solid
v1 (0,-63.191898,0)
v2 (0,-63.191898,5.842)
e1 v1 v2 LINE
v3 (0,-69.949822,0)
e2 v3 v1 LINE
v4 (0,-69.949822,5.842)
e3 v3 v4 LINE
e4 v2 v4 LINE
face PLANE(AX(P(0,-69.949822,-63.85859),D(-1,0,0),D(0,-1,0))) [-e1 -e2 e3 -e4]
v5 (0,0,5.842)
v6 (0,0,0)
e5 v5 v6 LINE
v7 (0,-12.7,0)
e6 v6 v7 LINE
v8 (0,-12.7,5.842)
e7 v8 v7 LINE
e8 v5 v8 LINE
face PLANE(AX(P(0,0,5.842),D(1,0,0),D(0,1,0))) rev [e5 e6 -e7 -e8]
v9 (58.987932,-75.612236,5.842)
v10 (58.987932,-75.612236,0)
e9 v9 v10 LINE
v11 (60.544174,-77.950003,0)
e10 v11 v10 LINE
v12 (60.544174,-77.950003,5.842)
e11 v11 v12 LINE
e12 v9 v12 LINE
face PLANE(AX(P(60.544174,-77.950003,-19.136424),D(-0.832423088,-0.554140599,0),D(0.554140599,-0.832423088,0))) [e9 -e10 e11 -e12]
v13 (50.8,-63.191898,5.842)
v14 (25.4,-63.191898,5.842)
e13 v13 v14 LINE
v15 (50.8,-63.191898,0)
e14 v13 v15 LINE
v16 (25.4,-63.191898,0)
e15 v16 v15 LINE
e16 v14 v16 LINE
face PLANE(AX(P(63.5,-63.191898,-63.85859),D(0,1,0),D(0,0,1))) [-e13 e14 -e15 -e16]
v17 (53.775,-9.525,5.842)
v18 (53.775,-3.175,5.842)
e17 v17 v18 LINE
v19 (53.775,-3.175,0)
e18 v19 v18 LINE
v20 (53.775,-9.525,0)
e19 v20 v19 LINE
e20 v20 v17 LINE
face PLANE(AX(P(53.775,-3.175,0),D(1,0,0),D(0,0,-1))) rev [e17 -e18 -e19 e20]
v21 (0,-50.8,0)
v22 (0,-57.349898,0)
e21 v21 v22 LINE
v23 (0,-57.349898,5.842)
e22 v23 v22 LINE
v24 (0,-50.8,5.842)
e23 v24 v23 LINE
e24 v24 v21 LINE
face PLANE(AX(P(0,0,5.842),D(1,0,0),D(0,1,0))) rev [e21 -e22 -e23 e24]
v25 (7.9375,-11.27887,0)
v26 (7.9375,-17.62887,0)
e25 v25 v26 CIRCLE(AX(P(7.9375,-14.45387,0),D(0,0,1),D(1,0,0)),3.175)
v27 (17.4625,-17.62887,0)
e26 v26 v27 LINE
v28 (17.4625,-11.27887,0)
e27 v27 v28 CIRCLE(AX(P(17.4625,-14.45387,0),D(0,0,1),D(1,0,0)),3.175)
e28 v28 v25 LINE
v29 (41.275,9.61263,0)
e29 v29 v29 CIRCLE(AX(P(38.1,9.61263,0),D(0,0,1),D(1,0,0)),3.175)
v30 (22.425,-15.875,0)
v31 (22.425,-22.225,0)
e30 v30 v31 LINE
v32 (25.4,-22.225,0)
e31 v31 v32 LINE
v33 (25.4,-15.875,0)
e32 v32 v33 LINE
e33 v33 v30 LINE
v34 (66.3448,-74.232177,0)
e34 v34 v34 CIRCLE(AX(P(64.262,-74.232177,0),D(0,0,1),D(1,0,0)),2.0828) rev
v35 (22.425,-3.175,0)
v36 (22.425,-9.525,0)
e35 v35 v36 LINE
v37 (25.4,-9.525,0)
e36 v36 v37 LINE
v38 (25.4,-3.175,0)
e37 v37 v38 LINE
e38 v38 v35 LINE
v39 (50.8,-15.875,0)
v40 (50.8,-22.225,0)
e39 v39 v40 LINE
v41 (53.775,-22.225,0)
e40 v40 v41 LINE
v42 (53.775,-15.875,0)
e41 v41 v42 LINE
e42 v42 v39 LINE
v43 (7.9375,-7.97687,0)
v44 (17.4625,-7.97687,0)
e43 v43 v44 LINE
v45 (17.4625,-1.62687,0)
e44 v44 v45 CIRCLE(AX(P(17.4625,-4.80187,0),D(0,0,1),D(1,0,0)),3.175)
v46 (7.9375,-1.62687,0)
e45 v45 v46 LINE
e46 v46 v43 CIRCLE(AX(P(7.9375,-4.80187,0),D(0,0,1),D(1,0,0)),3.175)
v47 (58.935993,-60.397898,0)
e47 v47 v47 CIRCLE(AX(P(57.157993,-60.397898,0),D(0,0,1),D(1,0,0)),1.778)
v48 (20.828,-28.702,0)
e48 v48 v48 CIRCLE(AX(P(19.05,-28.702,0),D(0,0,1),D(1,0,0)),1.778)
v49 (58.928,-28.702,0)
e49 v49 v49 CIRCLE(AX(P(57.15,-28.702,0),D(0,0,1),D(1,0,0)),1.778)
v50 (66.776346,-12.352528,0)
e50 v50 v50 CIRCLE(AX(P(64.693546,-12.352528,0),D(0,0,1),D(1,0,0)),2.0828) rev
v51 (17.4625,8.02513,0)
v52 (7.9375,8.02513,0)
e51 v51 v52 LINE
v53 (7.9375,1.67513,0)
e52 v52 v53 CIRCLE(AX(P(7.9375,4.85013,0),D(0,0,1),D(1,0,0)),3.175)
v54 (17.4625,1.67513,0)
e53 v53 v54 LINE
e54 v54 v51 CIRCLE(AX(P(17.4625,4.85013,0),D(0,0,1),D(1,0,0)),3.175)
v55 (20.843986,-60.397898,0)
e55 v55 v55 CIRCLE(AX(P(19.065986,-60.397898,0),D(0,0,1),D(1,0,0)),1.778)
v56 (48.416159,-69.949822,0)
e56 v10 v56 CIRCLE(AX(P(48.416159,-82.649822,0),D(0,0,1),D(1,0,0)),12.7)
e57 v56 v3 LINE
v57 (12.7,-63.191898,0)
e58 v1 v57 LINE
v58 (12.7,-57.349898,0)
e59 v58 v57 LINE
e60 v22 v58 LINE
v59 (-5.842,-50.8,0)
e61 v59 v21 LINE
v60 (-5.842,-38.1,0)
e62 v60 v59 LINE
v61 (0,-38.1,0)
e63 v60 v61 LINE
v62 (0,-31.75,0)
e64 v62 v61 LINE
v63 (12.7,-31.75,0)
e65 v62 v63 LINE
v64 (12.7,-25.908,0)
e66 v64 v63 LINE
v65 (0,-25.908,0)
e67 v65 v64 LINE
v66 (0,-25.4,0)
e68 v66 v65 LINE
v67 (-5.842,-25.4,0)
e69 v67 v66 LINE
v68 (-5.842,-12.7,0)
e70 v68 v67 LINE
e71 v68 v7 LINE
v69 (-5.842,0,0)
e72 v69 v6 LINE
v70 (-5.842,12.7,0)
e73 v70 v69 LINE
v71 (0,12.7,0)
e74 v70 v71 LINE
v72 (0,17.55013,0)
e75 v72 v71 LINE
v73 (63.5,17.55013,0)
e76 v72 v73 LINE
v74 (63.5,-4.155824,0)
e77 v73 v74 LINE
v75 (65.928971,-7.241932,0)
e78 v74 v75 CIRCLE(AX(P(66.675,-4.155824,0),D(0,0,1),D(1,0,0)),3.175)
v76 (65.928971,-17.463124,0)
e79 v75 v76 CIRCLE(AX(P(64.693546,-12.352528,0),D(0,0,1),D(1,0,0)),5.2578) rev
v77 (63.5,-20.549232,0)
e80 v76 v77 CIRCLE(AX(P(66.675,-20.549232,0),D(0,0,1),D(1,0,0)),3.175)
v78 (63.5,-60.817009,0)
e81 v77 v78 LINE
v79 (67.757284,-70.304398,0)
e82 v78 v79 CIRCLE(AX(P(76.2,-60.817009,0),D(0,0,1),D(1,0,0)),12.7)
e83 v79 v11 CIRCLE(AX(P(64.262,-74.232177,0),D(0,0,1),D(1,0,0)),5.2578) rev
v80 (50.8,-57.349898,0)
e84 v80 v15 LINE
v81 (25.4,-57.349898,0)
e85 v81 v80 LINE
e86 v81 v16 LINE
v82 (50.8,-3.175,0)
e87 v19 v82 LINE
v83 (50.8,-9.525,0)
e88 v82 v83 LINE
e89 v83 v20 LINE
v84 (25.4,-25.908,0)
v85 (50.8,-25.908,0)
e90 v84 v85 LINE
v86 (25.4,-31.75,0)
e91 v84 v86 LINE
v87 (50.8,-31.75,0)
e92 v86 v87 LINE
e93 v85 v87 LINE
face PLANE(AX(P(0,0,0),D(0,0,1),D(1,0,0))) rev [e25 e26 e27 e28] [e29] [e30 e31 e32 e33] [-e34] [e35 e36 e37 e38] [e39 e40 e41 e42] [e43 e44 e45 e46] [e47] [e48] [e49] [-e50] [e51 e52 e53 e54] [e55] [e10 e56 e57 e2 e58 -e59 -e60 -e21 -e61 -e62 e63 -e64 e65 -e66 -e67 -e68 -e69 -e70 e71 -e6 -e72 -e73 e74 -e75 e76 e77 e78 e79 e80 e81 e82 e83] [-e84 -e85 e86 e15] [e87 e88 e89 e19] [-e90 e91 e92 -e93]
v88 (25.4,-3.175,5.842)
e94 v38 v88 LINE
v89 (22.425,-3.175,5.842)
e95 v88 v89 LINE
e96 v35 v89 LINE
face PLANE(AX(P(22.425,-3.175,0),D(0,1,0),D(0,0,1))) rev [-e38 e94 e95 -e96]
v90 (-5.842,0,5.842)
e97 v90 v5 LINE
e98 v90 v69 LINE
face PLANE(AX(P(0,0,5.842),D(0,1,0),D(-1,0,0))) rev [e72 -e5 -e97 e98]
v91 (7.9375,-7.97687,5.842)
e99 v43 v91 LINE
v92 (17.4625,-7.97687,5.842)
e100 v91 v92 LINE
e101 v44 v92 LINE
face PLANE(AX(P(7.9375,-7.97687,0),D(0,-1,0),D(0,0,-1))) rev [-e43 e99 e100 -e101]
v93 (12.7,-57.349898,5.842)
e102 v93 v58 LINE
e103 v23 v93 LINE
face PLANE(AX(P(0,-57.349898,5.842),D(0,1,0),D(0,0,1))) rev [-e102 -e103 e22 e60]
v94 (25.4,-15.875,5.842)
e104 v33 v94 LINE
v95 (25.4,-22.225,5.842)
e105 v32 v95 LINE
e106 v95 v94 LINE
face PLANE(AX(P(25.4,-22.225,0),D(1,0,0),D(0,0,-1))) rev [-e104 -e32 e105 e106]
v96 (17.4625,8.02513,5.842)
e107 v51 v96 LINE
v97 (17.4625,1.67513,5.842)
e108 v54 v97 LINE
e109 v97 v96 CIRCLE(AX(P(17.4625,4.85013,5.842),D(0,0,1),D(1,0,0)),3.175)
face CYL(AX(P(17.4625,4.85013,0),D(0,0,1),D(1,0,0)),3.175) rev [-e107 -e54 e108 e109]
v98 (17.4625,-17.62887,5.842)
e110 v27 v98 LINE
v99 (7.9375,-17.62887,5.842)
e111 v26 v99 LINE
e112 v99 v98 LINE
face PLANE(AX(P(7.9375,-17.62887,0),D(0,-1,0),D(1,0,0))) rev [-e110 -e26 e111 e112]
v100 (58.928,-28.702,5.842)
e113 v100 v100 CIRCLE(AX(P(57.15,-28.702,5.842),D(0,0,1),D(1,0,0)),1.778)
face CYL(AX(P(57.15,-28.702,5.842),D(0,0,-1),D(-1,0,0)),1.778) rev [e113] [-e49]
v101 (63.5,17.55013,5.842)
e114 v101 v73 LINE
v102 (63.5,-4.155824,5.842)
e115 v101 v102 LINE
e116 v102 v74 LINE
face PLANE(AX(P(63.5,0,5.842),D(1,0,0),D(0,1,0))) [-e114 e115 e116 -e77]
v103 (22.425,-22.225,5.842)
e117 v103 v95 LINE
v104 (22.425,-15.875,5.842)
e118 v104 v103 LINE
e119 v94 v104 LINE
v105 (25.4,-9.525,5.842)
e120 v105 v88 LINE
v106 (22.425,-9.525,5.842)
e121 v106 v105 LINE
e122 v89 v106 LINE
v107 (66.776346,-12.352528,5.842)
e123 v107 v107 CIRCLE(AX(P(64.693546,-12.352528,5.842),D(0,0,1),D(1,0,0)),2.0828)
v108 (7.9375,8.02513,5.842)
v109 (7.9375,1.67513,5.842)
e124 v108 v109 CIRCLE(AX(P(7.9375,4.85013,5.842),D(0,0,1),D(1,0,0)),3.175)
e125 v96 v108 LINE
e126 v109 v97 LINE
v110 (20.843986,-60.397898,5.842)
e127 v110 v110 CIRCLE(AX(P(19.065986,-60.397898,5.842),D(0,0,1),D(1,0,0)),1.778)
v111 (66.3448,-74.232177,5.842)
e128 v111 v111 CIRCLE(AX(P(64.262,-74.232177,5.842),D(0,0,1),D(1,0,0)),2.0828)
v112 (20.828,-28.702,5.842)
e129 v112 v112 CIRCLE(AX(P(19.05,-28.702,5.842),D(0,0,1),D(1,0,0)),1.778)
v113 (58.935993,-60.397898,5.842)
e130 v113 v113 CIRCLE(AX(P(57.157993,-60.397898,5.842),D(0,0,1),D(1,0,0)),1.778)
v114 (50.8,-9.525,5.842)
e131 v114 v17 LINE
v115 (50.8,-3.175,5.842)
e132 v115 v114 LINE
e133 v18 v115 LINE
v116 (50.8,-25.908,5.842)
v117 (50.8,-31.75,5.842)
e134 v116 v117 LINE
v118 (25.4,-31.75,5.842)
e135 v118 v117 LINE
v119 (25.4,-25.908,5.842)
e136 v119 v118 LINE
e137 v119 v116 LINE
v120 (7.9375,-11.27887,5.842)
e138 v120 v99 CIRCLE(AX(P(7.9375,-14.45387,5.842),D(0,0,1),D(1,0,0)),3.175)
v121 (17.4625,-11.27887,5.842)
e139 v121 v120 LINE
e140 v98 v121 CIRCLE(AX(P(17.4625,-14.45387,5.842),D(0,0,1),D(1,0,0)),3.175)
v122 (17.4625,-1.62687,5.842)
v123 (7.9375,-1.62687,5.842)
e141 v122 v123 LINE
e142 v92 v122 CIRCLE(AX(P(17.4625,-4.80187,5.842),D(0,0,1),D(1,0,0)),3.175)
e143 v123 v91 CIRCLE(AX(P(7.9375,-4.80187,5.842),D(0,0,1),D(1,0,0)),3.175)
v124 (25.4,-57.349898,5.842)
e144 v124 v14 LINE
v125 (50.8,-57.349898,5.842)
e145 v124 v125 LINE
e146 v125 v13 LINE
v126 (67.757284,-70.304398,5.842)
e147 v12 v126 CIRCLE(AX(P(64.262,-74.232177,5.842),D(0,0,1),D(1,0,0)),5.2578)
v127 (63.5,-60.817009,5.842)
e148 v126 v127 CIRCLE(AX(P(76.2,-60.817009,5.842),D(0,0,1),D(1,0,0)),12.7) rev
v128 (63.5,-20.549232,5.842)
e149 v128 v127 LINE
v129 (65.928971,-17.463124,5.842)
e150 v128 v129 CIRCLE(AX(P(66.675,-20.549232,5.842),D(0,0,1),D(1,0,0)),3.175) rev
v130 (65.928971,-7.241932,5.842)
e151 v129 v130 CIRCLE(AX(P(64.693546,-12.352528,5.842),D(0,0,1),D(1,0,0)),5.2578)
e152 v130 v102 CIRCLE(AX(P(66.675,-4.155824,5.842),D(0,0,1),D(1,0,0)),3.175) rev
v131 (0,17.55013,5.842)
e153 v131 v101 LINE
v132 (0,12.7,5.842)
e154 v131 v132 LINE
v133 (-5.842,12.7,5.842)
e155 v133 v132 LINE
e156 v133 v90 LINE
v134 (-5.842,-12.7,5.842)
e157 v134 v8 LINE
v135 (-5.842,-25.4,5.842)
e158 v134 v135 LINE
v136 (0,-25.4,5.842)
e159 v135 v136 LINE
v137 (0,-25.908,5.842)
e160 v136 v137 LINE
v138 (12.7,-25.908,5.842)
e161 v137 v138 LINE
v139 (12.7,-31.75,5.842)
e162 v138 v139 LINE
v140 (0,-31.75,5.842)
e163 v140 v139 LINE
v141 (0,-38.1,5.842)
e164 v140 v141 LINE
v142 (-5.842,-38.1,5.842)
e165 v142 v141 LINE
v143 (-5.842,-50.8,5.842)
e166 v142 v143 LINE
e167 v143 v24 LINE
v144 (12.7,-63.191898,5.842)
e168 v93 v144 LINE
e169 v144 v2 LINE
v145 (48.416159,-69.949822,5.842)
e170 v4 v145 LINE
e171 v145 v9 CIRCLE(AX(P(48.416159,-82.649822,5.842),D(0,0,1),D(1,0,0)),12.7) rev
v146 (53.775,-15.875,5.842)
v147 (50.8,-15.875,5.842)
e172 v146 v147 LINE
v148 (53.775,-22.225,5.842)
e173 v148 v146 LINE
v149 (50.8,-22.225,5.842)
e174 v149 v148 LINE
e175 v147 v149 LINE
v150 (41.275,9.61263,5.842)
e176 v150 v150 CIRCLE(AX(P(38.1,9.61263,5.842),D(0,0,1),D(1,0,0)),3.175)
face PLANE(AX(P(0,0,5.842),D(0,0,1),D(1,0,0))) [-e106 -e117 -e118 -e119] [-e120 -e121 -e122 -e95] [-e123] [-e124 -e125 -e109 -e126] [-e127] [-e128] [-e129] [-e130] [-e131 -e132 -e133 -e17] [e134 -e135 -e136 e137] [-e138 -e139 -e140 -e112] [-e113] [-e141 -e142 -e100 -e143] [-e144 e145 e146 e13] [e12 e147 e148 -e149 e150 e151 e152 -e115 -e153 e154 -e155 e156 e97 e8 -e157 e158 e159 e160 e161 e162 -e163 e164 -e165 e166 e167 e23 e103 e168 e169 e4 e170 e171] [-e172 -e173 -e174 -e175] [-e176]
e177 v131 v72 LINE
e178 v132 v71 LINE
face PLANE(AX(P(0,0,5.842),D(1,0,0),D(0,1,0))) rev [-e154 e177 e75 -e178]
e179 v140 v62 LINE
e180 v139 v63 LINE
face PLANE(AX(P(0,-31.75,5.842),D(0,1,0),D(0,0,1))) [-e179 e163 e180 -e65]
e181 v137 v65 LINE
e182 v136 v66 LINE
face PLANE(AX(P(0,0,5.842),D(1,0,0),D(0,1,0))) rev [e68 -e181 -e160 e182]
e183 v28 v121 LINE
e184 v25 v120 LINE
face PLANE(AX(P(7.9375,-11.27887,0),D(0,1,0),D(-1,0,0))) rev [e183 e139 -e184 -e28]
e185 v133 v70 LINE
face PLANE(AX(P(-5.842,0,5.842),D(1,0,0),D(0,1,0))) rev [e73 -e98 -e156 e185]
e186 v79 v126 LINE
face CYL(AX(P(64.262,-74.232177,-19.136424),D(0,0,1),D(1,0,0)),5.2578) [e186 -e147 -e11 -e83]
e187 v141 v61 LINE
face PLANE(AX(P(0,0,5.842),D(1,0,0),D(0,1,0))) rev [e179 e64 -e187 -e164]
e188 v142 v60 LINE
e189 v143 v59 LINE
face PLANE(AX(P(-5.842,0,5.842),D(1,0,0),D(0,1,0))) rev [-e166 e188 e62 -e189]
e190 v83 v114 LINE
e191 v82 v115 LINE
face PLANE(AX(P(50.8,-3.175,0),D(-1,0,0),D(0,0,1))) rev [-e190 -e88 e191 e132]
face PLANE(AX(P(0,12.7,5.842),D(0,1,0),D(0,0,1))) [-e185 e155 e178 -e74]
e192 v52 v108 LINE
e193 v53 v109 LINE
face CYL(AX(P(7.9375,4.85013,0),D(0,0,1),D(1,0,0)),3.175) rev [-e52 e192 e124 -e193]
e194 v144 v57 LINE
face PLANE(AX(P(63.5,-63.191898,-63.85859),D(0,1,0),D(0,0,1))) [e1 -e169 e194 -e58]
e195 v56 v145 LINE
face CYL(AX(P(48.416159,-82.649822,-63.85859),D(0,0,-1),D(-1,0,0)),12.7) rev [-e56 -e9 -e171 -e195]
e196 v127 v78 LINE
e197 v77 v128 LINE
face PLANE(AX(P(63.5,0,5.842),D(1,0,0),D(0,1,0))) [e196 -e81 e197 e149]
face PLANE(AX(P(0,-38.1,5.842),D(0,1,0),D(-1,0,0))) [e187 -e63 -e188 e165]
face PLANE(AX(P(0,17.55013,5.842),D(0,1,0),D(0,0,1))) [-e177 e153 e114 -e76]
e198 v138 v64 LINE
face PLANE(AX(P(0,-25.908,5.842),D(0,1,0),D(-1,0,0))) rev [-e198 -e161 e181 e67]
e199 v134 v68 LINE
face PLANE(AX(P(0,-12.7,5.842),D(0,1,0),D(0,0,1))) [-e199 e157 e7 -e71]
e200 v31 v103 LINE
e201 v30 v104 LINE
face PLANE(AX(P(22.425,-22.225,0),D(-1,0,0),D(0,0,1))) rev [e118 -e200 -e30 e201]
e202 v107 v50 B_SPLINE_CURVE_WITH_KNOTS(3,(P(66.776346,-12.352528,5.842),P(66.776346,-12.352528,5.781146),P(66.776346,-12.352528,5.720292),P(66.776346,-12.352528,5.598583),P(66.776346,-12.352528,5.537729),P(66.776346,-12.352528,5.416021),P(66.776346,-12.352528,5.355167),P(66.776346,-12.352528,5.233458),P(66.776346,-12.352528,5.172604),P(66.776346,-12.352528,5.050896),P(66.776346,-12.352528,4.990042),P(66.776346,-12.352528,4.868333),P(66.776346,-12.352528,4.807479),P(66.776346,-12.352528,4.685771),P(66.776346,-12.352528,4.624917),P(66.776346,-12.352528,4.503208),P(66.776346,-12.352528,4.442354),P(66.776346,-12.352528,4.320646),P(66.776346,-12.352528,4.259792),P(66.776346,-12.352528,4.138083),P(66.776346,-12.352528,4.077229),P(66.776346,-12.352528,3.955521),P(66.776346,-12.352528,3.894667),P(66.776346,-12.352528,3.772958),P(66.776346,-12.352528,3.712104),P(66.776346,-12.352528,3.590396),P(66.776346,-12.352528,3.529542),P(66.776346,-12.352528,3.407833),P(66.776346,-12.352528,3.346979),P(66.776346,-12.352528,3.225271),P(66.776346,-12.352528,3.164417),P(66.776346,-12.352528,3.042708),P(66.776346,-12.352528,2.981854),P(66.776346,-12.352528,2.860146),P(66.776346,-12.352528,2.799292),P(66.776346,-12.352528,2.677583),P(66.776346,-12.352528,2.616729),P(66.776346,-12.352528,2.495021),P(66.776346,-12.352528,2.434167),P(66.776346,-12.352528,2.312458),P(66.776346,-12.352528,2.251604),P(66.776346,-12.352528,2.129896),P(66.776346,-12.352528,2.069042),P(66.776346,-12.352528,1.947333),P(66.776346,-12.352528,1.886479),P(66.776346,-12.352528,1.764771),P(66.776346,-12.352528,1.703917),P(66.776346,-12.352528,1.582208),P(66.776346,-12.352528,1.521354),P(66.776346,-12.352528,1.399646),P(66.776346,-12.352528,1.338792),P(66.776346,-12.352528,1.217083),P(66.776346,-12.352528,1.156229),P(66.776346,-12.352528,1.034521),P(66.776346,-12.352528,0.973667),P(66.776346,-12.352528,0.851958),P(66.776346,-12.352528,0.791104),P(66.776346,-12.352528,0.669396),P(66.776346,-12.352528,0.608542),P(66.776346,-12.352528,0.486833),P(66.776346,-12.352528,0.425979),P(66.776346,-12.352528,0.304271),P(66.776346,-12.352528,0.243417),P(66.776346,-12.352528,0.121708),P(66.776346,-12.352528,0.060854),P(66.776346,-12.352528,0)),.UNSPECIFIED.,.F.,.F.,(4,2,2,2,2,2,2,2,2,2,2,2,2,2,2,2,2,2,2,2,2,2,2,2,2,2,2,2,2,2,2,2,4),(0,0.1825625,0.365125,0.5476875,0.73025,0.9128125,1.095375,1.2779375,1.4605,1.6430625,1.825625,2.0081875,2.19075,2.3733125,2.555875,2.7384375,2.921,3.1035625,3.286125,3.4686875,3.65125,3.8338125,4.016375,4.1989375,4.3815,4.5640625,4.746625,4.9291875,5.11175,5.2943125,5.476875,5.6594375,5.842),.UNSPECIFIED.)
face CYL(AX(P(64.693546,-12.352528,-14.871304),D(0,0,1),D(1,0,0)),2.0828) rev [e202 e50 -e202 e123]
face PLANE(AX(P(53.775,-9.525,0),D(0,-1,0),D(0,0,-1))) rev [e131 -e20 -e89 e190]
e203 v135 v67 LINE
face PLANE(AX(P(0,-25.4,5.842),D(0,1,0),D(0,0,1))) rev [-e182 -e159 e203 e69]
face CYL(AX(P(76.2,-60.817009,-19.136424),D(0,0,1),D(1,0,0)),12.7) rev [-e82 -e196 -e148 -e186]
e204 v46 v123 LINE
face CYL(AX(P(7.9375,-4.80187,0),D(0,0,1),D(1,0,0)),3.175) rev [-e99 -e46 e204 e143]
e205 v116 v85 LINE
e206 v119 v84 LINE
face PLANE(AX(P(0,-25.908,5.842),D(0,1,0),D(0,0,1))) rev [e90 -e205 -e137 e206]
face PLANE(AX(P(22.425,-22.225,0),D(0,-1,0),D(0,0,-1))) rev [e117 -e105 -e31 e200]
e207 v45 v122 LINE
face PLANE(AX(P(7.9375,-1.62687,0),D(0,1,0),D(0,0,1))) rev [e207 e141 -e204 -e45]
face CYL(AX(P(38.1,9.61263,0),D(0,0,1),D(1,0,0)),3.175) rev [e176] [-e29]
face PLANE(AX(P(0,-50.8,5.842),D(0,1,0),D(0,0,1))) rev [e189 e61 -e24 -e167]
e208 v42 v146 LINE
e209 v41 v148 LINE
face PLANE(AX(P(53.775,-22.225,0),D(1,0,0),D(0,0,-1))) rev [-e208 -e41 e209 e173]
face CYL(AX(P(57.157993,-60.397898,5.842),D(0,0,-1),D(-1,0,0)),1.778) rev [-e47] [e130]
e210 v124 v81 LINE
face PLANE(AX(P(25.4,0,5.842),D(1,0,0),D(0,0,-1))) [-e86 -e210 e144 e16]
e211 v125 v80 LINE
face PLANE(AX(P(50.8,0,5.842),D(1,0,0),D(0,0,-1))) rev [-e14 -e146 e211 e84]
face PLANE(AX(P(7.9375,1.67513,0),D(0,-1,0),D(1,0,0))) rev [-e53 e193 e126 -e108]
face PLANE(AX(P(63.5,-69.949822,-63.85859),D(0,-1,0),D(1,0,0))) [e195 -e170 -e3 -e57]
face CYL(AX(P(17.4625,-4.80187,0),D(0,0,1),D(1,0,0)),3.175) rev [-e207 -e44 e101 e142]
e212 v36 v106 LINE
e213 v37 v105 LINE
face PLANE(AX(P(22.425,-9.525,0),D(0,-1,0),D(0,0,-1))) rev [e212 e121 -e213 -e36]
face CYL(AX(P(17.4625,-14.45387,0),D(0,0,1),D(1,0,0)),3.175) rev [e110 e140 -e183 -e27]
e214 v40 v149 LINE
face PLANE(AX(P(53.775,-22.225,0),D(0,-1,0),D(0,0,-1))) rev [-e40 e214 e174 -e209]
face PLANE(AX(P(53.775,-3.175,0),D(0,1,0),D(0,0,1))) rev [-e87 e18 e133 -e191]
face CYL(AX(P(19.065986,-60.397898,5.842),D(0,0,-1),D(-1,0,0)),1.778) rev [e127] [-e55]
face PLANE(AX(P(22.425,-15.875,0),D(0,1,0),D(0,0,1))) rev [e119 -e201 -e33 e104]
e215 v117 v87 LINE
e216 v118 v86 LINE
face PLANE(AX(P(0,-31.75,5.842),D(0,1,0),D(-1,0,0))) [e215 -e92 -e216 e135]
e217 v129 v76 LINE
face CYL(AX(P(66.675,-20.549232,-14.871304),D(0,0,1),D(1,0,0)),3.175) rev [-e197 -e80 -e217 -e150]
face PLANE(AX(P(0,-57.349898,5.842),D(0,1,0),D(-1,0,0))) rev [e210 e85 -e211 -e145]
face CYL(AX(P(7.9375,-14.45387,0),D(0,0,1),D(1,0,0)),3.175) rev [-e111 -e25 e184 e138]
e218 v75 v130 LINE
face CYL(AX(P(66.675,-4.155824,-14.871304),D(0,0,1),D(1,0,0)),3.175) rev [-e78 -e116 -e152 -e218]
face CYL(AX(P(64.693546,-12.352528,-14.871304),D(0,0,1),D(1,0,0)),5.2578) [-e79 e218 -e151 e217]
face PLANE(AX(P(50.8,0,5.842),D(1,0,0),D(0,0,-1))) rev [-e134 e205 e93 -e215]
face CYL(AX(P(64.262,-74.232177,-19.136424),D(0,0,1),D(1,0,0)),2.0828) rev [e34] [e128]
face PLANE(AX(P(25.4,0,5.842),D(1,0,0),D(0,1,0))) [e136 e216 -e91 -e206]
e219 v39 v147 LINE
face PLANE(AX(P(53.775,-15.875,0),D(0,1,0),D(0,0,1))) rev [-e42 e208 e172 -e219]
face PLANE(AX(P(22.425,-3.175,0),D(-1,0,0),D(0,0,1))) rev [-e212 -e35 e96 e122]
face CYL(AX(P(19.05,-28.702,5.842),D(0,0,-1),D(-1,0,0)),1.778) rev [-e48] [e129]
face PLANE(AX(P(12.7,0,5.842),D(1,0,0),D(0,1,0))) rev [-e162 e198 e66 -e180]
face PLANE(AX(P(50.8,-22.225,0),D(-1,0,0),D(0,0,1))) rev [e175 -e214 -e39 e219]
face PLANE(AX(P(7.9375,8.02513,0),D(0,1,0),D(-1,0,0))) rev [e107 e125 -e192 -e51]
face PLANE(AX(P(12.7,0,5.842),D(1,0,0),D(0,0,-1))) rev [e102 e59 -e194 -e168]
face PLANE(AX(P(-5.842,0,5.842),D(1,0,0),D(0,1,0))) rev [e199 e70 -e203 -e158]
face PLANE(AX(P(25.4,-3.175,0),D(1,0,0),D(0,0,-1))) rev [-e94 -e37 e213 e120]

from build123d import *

# Parameters (mm, degrees)
SKETCH1_R           = 1.778
SKETCH1_W           = 25.4
SKETCH1_H           = 5.842
BOSS_EXTRUDE1_DEPTH = 5.842
SKETCH2_W           = 63.5
SKETCH2_H           = 6.757924
BOSS_EXTRUDE2_DEPTH = 5.842
FILLET1_R           = 3.175
SKETCH4_R           = 3.175
SKETCH4_W           = 2.975
SKETCH4_H           = 6.35
CUT_EXTRUDE2_DEPTH  = 95.65387769
CUT_EXTRUDE3_DEPTH  = 95.65387769
BOSS_EXTRUDE4_START = -5.842
SKETCH7_R           = 2.0828
BOSS_EXTRUDE4_DEPTH = 5.842
FILLET12_R          = 12.7
SKETCH8_R           = 2.0828
BOSS_EXTRUDE5_DEPTH = 5.842
FILLET13_R          = 3.175
SKETCH9_R           = 2.0828
CUT_EXTRUDE4_DEPTH  = 107.047047485


with BuildPart() as part:
    # Sketch1 → Boss-Extrude1 (new body)
    with BuildSketch(Plane.XY):
        Polygon((0, 12.7), (-5.842, 12.7), (-5.842, 0), (0, 0), (0, -12.7), (-5.842, -12.7), (-5.842, -25.4), (0, -25.4), (0, -25.908), (12.7, -25.908), (12.7, -31.75), (0, -31.75), (0, -38.1), (-5.842, -38.1), (-5.842, -50.8), (0, -50.8), (0, -57.349898), (12.7, -57.349898), (12.7, -63.191898), (25.4, -63.191898), (25.4, -57.349898), (50.8, -57.349898), (50.8, -63.191898), (63.5, -63.191898), (63.5, 17.55013), (0, 17.55013), align=None)
        with Locations((19.065986419, -60.397898)):
            Circle(SKETCH1_R, mode=Mode.SUBTRACT)
        with Locations((19.05, -28.702)):
            Circle(SKETCH1_R, mode=Mode.SUBTRACT)
        with Locations((57.157993209, -60.397898)):
            Circle(SKETCH1_R, mode=Mode.SUBTRACT)
        with Locations((38.1, -28.829)):
            Rectangle(SKETCH1_W, SKETCH1_H, mode=Mode.SUBTRACT)
        with Locations((57.15, -28.702)):
            Circle(SKETCH1_R, mode=Mode.SUBTRACT)
    extrude(amount=BOSS_EXTRUDE1_DEPTH)

    # Sketch2 → Boss-Extrude2 (add)
    with BuildSketch(Plane.XY.offset(5.842)):
        with Locations((31.75, -66.57086)):
            Rectangle(SKETCH2_W, SKETCH2_H)
    extrude(amount=-BOSS_EXTRUDE2_DEPTH)

    # Fillet1
    fillet1_edges = [part.edges().sort_by_distance(p)[0] for p in [
        (63.5, -69.949822, 2.921),
    ]]
    fillet(fillet1_edges, radius=FILLET1_R)

    # Sketch4 → Cut-Extrude2 (cut, through all)
    with BuildSketch(Plane.XY.offset(5.842)):
        with Locations((38.1, 9.61263)):
            Circle(SKETCH4_R)
        with Locations((23.9125, -6.35)):
            Rectangle(SKETCH4_W, SKETCH4_H)
        with Locations((23.9125, -19.05)):
            Rectangle(SKETCH4_W, SKETCH4_H)
        with Locations((52.2875, -19.05)):
            Rectangle(SKETCH4_W, SKETCH4_H)
        with Locations((52.2875, -6.35)):
            Rectangle(SKETCH4_W, SKETCH4_H)
    extrude(amount=-CUT_EXTRUDE2_DEPTH, mode=Mode.SUBTRACT)

    # Sketch5 → Cut-Extrude3 (cut, through all)
    with BuildSketch(Plane.XY.offset(5.842)):
        with BuildLine():
            Line((7.9375, 8.02513), (17.4625, 8.02513))
            ThreePointArc((17.4625, 8.02513), (20.6375, 4.85013), (17.4625, 1.67513))
            Line((17.4625, 1.67513), (7.9375, 1.67513))
            ThreePointArc((7.9375, 1.67513), (4.7625, 4.85013), (7.9375, 8.02513))
        make_face()
        with BuildLine():
            Line((7.9375, -1.62687), (17.4625, -1.62687))
            ThreePointArc((17.4625, -1.62687), (20.6375, -4.80187), (17.4625, -7.97687))
            Line((17.4625, -7.97687), (7.9375, -7.97687))
            ThreePointArc((7.9375, -7.97687), (4.7625, -4.80187), (7.9375, -1.62687))
        make_face()
        with BuildLine():
            Line((7.9375, -11.27887), (17.4625, -11.27887))
            ThreePointArc((17.4625, -11.27887), (20.6375, -14.45387), (17.4625, -17.62887))
            Line((17.4625, -17.62887), (7.9375, -17.62887))
            ThreePointArc((7.9375, -17.62887), (4.7625, -14.45387), (7.9375, -11.27887))
        make_face()
    extrude(amount=-CUT_EXTRUDE3_DEPTH, mode=Mode.SUBTRACT)

    # Sketch7 → Boss-Extrude4 (add)
    with BuildSketch(Plane.XY.offset(5.842).offset(BOSS_EXTRUDE4_START)):
        with BuildLine():
            Line((60.544173966, -77.950003252), (55.218486469, -69.949822))
            Line((55.218486469, -69.949822), (60.325, -69.949822))
            ThreePointArc((60.325, -69.949822), (62.57006403, -69.01988603), (63.5, -66.774822))
            Line((63.5, -66.774822), (67.615323654, -70.182525218))
            ThreePointArc((67.615323654, -70.182525218), (68.150012892, -77.771642798), (60.544173966, -77.950003252))
        make_face()
        with Locations((64.262, -74.232177218)):
            Circle(SKETCH7_R, mode=Mode.SUBTRACT)
    extrude(amount=BOSS_EXTRUDE4_DEPTH)

    # Fillet12
    fillet12_edges = [part.edges().sort_by_distance(p)[0] for p in [
        (55.218486469, -69.949822, 2.921),
        (63.5, -66.774822, 2.921),
    ]]
    fillet(fillet12_edges, radius=FILLET12_R)

    # Sketch8 → Boss-Extrude5 (add)
    with BuildSketch(Plane.XY.offset(5.842)):
        with BuildLine():
            Line((64.693546, -17.610328), (63.5, -17.610328))
            Line((63.5, -17.610328), (63.5, -17.473065939))
            ThreePointArc((63.5, -17.473065939), (59.435746, -12.352528), (63.5, -7.231990061))
            Line((63.5, -7.231990061), (63.5, -7.094728))
            Line((63.5, -7.094728), (64.693546, -7.094728))
            ThreePointArc((64.693546, -7.094728), (69.951346, -12.352528), (64.693546, -17.610328))
        make_face()
        with Locations((64.693546, -12.352528)):
            Circle(SKETCH8_R, mode=Mode.SUBTRACT)
    extrude(amount=-BOSS_EXTRUDE5_DEPTH)

    # Fillet13
    # the kernel refuses this fillet: 3.175 mm, written as the material it adds along each edge
    with BuildSketch(Plane(origin=(63.5, -7.094728, 5.842), x_dir=(0, 1, 0), z_dir=(0, 0, -1))) as fillet13_piece_1:
        with BuildLine():
            CenterArc((2.938903965, 3.175), FILLET13_R, 193.589847282, 76.410152718)
            Line((-0.147204456, 2.428970633), (-0.455815298, 2.354367696))
            ThreePointArc((-0.455815298, 2.354367696), (-0.3175, 1.193546), (-0.3175, 0))
            Line((-0.3175, 0), (0, -0.3175))
            Line((0, -0.3175), (2.938903965, -0.3175))
            Line((2.938903965, -0.3175), (2.938903965, 0))
        make_face()
    extrude(amount=5.842)
    with BuildSketch(Plane(origin=(63.5, -17.610328, 5.842), x_dir=(0.9981686426778995, 0.0604926505830248, 0), z_dir=(0, 0, -1))) as fillet13_piece_2:
        with BuildLine():
            CenterArc((2.99140335, 3.125585947), FILLET13_R, 183.468090933, 76.410152718)
            Line((-0.177782091, 2.933521781), (-0.494700635, 2.914315365))
            Line((-0.494700635, 2.914315365), (-0.316918544, -0.019206417))
            Line((-0.316918544, -0.019206417), (0.019206417, -0.316918544))
            ThreePointArc((0.019206417, -0.316918544), (1.210566607, -0.244717783), (2.377629483, -0.312558595))
            Line((2.377629483, -0.312558595), (2.433427107, 0))
        make_face()
    extrude(amount=5.842)
    # the kernel refuses this fillet: 3.175 mm, written as the material it takes off along each edge

    # Sketch9 → Cut-Extrude4 (cut, through all)
    with BuildSketch(Plane.XY.offset(5.842)):
        with Locations((64.693546, -12.352528)):
            Circle(SKETCH9_R)
    extrude(amount=-CUT_EXTRUDE4_DEPTH, mode=Mode.SUBTRACT)


solid = part.part
